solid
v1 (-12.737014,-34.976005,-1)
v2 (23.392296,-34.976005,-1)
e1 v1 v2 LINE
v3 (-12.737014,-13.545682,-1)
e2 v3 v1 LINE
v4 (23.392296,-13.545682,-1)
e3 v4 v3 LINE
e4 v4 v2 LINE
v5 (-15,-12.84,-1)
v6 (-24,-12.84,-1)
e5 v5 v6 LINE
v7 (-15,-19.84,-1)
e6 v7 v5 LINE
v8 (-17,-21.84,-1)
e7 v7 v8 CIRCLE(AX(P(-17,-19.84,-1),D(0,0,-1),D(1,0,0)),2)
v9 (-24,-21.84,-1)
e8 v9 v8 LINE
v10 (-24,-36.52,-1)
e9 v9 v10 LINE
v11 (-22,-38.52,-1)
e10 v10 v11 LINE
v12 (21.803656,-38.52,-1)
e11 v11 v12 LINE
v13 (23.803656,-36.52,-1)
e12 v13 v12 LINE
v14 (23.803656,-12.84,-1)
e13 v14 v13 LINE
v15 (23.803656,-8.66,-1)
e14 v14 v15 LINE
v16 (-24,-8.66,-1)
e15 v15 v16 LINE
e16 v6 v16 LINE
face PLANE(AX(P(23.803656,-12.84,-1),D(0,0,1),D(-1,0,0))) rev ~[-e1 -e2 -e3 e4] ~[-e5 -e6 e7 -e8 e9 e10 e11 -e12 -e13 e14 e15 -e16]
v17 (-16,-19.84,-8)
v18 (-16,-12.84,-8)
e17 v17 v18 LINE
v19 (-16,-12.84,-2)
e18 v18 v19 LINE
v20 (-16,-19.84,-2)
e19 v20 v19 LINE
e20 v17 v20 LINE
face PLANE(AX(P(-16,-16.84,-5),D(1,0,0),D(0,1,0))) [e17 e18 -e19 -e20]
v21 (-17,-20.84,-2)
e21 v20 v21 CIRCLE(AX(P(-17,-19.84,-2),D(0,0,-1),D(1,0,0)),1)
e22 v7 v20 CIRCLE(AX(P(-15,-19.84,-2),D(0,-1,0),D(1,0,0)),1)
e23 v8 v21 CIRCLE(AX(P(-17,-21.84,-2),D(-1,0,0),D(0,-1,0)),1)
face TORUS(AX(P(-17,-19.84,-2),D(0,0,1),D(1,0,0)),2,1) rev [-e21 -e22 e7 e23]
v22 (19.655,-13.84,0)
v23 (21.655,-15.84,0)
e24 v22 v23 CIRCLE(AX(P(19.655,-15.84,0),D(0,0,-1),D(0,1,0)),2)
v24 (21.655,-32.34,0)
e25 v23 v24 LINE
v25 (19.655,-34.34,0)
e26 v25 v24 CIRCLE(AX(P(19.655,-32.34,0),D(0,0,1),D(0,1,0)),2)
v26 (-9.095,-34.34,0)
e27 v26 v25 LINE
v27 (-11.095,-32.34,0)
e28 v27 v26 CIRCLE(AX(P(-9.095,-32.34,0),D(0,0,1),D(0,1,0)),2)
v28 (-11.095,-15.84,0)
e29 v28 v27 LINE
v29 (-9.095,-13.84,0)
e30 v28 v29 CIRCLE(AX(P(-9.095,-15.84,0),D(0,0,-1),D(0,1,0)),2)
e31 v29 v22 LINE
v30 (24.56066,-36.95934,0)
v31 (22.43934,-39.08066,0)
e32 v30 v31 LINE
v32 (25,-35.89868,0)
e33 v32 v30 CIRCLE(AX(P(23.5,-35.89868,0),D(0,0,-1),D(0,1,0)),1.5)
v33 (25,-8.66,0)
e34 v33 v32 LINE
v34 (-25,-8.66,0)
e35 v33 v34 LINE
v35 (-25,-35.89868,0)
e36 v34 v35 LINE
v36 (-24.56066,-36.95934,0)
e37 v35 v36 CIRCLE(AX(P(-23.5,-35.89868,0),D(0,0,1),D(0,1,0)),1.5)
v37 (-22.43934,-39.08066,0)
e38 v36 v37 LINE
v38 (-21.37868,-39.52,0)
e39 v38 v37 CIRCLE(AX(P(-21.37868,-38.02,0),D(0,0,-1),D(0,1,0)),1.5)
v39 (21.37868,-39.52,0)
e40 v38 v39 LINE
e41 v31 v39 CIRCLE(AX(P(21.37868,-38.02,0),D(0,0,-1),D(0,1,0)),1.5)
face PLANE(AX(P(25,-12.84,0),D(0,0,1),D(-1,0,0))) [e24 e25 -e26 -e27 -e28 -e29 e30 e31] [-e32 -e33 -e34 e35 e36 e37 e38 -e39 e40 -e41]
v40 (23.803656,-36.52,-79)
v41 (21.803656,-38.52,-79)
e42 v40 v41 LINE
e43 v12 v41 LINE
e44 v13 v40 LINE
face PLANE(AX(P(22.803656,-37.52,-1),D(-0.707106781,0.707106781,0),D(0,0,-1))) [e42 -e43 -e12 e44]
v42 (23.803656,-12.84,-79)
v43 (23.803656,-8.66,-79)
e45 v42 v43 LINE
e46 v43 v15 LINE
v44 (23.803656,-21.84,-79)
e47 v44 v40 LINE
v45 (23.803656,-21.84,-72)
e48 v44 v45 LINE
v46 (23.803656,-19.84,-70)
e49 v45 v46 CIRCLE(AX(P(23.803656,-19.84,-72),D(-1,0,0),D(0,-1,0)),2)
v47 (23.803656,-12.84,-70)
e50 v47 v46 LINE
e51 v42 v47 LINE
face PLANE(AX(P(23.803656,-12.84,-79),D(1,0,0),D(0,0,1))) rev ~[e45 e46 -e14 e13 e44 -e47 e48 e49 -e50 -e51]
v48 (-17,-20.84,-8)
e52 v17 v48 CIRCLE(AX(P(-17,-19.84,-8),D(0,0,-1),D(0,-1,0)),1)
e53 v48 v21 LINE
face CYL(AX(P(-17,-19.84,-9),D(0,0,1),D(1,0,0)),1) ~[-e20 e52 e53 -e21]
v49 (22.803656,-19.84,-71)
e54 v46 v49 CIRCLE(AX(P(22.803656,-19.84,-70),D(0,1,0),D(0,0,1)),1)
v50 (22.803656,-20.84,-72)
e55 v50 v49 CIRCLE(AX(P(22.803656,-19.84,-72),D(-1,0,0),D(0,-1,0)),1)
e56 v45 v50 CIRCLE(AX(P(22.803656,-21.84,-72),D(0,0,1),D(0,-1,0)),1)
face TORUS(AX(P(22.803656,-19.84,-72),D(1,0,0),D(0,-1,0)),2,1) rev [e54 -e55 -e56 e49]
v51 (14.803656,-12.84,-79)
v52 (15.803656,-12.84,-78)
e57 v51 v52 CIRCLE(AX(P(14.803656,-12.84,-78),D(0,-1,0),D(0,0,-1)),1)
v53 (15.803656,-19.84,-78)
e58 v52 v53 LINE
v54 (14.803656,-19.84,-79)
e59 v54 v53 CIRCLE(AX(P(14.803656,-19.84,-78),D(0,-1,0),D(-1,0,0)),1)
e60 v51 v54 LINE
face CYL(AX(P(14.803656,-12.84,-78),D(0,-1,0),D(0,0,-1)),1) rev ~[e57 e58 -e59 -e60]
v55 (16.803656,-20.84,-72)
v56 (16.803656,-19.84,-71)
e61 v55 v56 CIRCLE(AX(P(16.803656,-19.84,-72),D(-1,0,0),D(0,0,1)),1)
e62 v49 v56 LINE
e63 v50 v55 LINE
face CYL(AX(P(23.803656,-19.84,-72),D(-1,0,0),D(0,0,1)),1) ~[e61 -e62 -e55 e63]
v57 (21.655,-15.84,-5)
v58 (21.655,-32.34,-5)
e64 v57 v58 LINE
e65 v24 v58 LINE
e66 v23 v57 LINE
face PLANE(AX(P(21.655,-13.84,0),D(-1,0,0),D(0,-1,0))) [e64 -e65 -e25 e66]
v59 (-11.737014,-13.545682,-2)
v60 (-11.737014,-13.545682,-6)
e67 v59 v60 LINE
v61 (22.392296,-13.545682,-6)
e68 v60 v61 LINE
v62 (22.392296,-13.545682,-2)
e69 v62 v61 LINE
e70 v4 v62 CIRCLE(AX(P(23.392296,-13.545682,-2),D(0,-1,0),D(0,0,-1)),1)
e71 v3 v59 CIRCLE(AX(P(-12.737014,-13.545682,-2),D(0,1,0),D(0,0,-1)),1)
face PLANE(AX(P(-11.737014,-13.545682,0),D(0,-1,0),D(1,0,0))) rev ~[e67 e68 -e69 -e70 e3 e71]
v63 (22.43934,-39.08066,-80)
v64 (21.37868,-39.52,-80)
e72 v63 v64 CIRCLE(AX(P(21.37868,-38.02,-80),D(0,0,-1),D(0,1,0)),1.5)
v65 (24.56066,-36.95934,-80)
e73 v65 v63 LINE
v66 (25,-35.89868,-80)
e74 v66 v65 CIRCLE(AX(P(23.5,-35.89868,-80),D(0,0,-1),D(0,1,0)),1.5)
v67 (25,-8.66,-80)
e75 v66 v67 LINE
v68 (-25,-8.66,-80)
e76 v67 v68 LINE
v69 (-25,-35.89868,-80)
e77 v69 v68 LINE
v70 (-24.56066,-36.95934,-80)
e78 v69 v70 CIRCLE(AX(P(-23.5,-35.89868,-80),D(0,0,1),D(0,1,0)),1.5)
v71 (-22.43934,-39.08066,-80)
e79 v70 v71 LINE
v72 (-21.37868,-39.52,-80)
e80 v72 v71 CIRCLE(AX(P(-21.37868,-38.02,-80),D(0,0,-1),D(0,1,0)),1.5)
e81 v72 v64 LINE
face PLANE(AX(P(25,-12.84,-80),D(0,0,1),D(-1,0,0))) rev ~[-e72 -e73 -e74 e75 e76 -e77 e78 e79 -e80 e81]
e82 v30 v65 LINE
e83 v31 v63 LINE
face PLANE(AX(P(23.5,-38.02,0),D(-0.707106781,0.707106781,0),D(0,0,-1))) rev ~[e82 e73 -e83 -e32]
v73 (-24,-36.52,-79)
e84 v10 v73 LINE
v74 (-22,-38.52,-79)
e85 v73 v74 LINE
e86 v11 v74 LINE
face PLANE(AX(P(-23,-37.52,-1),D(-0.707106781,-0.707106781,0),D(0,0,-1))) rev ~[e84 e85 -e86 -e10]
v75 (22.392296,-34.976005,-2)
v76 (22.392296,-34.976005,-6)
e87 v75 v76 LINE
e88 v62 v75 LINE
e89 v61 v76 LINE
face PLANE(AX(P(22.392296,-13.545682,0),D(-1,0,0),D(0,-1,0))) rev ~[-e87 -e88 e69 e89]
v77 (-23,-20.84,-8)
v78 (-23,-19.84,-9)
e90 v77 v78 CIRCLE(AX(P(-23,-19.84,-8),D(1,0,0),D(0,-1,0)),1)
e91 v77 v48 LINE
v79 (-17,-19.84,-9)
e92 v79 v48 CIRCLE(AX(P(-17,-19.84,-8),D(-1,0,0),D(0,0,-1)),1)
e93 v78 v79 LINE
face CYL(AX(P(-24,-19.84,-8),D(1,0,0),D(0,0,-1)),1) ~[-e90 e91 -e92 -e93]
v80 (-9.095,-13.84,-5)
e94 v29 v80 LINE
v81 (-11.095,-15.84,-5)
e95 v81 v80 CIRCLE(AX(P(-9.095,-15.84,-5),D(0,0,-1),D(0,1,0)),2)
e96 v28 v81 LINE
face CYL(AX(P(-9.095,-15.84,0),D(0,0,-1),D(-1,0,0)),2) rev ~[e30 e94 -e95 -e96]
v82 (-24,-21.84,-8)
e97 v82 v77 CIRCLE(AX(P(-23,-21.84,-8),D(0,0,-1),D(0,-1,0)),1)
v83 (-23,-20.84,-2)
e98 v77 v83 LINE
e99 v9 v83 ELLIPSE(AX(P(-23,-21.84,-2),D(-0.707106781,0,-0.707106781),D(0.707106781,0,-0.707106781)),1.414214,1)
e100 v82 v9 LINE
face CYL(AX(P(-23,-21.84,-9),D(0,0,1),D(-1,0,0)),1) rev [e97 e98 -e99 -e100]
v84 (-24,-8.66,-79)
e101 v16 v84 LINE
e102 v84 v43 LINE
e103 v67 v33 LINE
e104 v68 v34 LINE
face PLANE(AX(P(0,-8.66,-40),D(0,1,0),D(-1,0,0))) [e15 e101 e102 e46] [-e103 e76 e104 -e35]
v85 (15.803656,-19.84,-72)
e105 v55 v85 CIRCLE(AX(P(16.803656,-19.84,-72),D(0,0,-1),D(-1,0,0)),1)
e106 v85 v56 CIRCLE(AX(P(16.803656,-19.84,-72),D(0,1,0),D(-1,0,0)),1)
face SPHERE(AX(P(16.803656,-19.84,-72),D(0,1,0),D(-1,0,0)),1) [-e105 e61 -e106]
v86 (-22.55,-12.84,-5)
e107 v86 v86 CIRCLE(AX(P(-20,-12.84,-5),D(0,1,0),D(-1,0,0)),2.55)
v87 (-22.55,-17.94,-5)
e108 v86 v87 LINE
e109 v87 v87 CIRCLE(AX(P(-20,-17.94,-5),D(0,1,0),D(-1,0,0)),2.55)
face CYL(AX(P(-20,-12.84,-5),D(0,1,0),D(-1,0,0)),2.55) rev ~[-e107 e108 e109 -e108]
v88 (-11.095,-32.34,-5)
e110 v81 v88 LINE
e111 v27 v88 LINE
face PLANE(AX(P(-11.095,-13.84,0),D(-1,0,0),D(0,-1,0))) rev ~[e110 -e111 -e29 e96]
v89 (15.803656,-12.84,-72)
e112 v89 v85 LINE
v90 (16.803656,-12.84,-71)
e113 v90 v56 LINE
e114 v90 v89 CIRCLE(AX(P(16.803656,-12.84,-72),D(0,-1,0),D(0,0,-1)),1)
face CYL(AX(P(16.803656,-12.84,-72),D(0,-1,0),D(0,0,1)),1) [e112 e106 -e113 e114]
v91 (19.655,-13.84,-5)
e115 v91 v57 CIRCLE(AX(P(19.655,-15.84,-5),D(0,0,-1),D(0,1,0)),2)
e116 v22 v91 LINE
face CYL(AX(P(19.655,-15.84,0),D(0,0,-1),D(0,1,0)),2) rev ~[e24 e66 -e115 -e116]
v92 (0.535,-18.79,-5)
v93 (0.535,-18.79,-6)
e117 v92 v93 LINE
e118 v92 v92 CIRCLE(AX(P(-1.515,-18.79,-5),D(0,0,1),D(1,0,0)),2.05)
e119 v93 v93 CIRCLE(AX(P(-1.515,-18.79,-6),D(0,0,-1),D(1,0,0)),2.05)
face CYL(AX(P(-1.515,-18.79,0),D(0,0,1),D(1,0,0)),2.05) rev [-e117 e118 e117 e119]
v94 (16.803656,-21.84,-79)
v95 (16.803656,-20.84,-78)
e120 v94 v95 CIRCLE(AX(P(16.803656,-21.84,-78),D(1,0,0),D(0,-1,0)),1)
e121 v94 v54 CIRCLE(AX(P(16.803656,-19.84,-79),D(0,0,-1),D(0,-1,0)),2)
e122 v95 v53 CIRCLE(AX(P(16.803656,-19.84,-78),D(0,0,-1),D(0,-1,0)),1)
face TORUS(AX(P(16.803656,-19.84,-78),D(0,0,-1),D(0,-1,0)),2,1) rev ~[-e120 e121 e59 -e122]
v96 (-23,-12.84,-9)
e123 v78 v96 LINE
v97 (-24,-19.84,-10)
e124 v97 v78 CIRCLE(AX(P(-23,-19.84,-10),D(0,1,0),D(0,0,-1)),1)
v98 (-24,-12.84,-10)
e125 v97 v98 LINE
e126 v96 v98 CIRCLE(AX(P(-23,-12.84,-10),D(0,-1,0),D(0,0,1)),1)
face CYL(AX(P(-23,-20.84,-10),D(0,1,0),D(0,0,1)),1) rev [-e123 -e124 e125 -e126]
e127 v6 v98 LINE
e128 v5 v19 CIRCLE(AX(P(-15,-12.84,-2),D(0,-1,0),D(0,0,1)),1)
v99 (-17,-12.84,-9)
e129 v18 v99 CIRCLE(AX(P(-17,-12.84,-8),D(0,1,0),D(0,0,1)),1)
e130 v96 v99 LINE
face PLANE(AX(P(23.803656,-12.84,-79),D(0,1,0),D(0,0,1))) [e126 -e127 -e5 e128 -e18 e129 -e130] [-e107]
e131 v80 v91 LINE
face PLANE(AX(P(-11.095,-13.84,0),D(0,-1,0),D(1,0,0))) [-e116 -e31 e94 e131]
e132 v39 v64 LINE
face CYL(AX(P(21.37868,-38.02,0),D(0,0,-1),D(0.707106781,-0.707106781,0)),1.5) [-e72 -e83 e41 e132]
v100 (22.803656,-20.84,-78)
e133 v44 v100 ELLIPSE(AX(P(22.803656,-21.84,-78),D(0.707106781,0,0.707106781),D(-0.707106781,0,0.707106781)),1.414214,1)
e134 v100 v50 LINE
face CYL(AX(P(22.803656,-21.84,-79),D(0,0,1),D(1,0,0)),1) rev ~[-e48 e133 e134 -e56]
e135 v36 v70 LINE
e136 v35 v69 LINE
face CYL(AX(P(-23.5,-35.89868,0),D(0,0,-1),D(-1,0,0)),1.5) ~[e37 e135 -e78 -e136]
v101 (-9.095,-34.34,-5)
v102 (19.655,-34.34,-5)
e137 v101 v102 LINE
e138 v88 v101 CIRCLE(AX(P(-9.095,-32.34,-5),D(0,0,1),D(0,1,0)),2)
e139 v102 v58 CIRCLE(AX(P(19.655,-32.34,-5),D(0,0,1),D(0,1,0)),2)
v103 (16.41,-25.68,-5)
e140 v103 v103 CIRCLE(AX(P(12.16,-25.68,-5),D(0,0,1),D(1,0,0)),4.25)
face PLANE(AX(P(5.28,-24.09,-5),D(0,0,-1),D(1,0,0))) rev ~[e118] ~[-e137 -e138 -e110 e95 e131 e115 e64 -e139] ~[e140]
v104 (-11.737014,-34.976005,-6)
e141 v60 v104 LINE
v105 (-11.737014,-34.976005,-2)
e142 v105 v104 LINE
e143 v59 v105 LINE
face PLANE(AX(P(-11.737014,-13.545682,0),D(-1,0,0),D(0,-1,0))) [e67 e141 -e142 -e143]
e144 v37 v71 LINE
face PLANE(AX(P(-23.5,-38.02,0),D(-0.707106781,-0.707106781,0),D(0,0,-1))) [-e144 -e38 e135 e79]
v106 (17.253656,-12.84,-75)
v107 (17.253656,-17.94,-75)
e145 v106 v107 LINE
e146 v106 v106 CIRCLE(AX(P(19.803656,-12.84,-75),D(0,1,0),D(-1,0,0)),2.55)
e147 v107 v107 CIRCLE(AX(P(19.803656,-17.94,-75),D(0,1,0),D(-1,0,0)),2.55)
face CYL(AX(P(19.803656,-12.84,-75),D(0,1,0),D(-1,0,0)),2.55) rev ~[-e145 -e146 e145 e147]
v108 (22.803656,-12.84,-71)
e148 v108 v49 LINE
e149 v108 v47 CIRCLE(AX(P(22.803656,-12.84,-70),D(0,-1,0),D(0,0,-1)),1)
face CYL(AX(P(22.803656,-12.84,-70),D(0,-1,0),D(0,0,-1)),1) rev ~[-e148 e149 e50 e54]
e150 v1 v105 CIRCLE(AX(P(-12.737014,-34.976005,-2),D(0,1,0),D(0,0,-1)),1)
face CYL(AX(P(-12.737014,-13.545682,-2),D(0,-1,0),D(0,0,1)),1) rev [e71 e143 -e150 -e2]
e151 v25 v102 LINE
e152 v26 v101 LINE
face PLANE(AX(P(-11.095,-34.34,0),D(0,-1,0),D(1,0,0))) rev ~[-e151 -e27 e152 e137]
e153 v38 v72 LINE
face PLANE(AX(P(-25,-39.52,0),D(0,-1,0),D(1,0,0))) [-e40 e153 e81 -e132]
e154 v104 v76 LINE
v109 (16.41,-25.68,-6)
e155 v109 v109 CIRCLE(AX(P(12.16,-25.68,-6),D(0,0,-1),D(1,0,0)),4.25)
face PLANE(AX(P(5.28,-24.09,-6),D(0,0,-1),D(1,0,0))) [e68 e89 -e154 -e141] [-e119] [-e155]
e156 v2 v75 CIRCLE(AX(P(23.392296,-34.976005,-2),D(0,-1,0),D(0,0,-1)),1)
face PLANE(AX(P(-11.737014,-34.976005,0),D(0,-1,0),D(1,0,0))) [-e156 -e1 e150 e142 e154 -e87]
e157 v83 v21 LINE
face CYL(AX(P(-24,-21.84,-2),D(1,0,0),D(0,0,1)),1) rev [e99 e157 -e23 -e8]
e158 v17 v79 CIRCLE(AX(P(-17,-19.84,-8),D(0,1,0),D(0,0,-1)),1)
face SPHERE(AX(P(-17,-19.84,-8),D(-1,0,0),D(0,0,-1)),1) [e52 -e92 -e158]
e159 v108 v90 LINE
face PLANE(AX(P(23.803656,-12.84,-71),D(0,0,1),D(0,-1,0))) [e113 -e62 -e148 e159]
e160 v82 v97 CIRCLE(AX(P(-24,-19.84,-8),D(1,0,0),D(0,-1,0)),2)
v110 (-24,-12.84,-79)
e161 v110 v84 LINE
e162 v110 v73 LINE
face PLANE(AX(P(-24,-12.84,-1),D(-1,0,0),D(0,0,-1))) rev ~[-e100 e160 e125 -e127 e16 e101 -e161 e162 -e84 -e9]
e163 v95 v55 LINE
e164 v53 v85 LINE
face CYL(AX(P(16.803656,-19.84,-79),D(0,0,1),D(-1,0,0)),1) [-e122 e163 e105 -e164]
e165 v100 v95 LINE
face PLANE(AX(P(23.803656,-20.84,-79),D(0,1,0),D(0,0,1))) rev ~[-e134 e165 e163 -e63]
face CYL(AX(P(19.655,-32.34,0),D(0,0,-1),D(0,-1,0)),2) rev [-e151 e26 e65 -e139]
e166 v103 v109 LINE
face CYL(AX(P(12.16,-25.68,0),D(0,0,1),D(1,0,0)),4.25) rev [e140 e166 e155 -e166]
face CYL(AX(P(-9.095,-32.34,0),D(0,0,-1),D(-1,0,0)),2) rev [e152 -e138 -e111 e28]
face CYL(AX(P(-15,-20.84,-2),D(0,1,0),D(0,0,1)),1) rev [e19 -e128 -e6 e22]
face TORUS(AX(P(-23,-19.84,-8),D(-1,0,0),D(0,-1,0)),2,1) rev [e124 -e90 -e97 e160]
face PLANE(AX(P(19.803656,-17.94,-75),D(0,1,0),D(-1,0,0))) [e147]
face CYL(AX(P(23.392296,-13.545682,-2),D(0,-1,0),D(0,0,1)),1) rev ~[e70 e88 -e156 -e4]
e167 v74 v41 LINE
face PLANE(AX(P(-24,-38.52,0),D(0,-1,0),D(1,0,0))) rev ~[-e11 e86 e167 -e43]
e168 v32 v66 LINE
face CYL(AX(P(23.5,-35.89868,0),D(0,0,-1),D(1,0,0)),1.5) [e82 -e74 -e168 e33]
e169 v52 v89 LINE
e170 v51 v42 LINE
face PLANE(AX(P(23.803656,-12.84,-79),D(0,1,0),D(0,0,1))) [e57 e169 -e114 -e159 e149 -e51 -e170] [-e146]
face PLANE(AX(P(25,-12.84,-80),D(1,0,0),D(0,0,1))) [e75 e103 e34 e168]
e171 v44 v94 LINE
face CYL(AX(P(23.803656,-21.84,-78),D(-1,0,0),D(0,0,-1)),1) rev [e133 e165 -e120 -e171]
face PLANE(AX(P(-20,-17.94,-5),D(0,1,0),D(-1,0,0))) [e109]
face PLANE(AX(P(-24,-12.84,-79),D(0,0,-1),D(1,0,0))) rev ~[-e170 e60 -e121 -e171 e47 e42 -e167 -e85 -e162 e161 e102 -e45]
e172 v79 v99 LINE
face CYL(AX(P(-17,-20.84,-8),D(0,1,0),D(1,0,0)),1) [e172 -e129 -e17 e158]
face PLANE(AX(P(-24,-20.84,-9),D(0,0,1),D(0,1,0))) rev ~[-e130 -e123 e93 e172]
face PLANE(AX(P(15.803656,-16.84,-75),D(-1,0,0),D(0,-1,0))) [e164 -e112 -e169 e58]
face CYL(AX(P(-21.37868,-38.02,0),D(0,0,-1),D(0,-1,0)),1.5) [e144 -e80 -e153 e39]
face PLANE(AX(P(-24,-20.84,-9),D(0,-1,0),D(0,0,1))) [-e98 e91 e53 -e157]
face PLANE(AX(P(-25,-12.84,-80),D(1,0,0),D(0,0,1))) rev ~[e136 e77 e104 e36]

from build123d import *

# Parameters (mm, degrees)
F1_W      = 50
F1_H      = 27.68
F1_W_2    = 47.8036555797
F1_H_2    = 25.68
F2_DEPTH  = 80
F1_W_3    = 34.129309468
F1_H_3    = 21.4303236678
F1_W_4    = 32.75
F1_H_4    = 20.5
F3_DEPTH  = 6
F0_W      = 32.75
F0_H      = 20.5
F0_R      = 2.05
F0_R_2    = 4.25
F4_DEPTH  = 6
F5_DEPTH  = 5
F6_DEPTH  = 1
F7_R      = 2
F8_W      = 50
F8_H      = 80
F9_DEPTH  = 1
F10_ANGLE = 180
F11_W     = 47.8036555797
F11_H     = 25.68
F12_DEPTH = 1
F13_W     = 8
F13_H     = 8
F14_DEPTH = 8
F15_W     = 8
F15_H     = 8
F16_DEPTH = 8
F19_SIZE  = 2
F20_SIZE  = 3
F21_R     = 1.5
F22_R     = 1
F18_R     = 2.55
F23_DEPTH = 5.1
F24_W     = 50
F24_H     = 80
F25_DEPTH = 4.18


with BuildPart() as f2:
    # F1 (on face) → F2 (new body)
    with BuildSketch(Plane.XY):
        Rectangle(F1_W, F1_H)
        with Locations((-0.0981722102, 0)):
            Rectangle(F1_W_2, F1_H_2, mode=Mode.SUBTRACT)
    extrude(amount=F2_DEPTH)

    # F8 (on face) → F9 (cut)
    with BuildSketch(Plane.XZ.offset(13.84)):
        with Locations((0, 40)):
            Rectangle(F8_W, F8_H)
    extrude(amount=-F9_DEPTH, mode=Mode.SUBTRACT)


with BuildPart() as f3:
    # F1 (on face) → F3 (new body)
    with BuildSketch(Plane.XY):
        with Locations((5.3276410885, -1.4191564249)):
            Rectangle(F1_W_3, F1_H_3)
        with Locations((5.28, -1.59)):
            Rectangle(F1_W_4, F1_H_4, mode=Mode.SUBTRACT)
    extrude(amount=F3_DEPTH)

    # F0 (on Top) → F4 (join)
    with BuildSketch(Plane.XY):
        with Locations((5.28, -1.59)):
            Rectangle(F0_W, F0_H)
        with Locations((-1.515, -6.89)):
            Circle(F0_R, mode=Mode.SUBTRACT)
        with Locations((12.16, 0)):
            Circle(F0_R_2, mode=Mode.SUBTRACT)
    extrude(amount=F4_DEPTH)

    # F1 (on face) → F5 (cut)
    with BuildSketch(Plane.XY):
        with Locations((5.28, -1.59)):
            Rectangle(F1_W_4, F1_H_4)
    extrude(amount=F5_DEPTH, mode=Mode.SUBTRACT)

    # F7
    f7_edges = [f3.edges().sort_by_distance(p)[0] for p in [
        (21.655, -11.84, 2.5),
        (-11.095, -11.84, 2.5),
        (21.655, 8.66, 2.5),
        (-11.095, 8.66, 2.5),
    ]]
    fillet(f7_edges, radius=F7_R)


with BuildPart() as f6:
    # F1 (on face) → F6 (new body)
    with BuildSketch(Plane.XY):
        with Locations((-0.0981722102, 0)):
            Rectangle(F1_W_2, F1_H_2)
        with Locations((5.3276410885, -1.4191564249)):
            Rectangle(F1_W_3, F1_H_3, mode=Mode.SUBTRACT)
    extrude(amount=F6_DEPTH)


with BuildPart() as f6_1:
    # F10: moved
    add(f6.part.rotate(Axis((-0.0981722102, -12.84, 0), (1, 0, 0)), F10_ANGLE))


with BuildPart() as f2_1:
    # F10: moved
    add(f2.part.rotate(Axis((-0.0981722102, -12.84, 0), (1, 0, 0)), F10_ANGLE))

    # F11 (on face) → F12 (join)
    with BuildSketch(Plane(origin=(0, 0, -80), x_dir=(1, 0, 0), z_dir=(0, 0, -1))):
        with Locations((-0.0981722102, 25.68)):
            Rectangle(F11_W, F11_H)
    extrude(amount=-F12_DEPTH)


    add(f6_1.part)  # F14 merges F6
    # F13 (on face) → F14 (join)
    with BuildSketch(Plane.YZ.offset(-24)):
        with Locations((-16.84, -5)):
            Rectangle(F13_W, F13_H)
    extrude(amount=F14_DEPTH)

    # F15 (on face) → F16 (join)
    with BuildSketch(Plane(origin=(23.8036555797, 0, 0), x_dir=(0, -1, 0), z_dir=(-1, 0, 0))):
        with Locations((16.84, -75)):
            Rectangle(F15_W, F15_H)
    extrude(amount=F16_DEPTH)


with BuildPart() as f3_1:
    # F10: moved
    add(f3.part.rotate(Axis((-0.0981722102, -12.84, 0), (1, 0, 0)), F10_ANGLE))


with BuildPart() as f2_2:
    add(f2_1.part)

    # F17: union F3
    add(f3_1.part)

    # F19
    f19_edges = [f2_2.edges().sort_by_distance(p)[0] for p in [
        (23.803656, -38.52, -40),
        (-24, -38.52, -40),
    ]]
    chamfer(f19_edges, length=F19_SIZE)

    # F20
    f20_edges = [f2_2.edges().sort_by_distance(p)[0] for p in [
        (-25, -39.52, -40),
        (25, -39.52, -40),
    ]]
    chamfer(f20_edges, length=F20_SIZE)

    # F21
    f21_edges = [f2_2.edges().sort_by_distance(p)[0] for p in [
        (25, -36.52, -40),
        (22, -39.52, -40),
        (-22, -39.52, -40),
        (-25, -36.52, -40),
    ]]
    fillet(f21_edges, radius=F21_R)

    # F22
    f22_edges = [f2_2.edges().sort_by_distance(p)[0] for p in [
        (-24, -16.84, -9),
        (-20, -20.84, -9),
        (-16, -16.84, -9),
        (-16, -20.84, -5),
        (-16, -16.84, -1),
        (15.803656, -16.84, -71),
        (23.803656, -16.84, -71),
        (15.803656, -16.84, -79),
        (15.803656, -20.84, -75),
        (19.803656, -20.84, -71),
        (-11.737014, -24.260844, -1),
        (22.392296, -24.260844, -1),
        (-20, -20.84, -1),
        (23.803656, -20.84, -75),
        (19.803656, -20.84, -79),
        (-24, -20.84, -5),
    ]]
    fillet(f22_edges, radius=F22_R)

    # F18 (on face) → F23 (cut)
    with BuildSketch(Plane(origin=(0, -12.84, 0), x_dir=(-1, 0, 0), z_dir=(0, 1, 0))):
        with Locations((20, -5)):
            Circle(F18_R)
        with Locations((-19.8036555797, -75)):
            Circle(F18_R)
    extrude(amount=-F23_DEPTH, mode=Mode.SUBTRACT)

    # F24 (on face) → F25 (join)
    with BuildSketch(Plane(origin=(0, -12.84, 0), x_dir=(-1, 0, 0), z_dir=(0, 1, 0))):
        with Locations((0, -40)):
            Rectangle(F24_W, F24_H)
        Polygon((-23.8036555797, -70), (-23.8036555797, -1), (15, -1), (24, -1), (24, -10), (24, -79), (-14.8036555797, -79), (-23.8036555797, -79), align=None, mode=Mode.SUBTRACT)
    extrude(amount=F25_DEPTH)


solid = f2_2.part
